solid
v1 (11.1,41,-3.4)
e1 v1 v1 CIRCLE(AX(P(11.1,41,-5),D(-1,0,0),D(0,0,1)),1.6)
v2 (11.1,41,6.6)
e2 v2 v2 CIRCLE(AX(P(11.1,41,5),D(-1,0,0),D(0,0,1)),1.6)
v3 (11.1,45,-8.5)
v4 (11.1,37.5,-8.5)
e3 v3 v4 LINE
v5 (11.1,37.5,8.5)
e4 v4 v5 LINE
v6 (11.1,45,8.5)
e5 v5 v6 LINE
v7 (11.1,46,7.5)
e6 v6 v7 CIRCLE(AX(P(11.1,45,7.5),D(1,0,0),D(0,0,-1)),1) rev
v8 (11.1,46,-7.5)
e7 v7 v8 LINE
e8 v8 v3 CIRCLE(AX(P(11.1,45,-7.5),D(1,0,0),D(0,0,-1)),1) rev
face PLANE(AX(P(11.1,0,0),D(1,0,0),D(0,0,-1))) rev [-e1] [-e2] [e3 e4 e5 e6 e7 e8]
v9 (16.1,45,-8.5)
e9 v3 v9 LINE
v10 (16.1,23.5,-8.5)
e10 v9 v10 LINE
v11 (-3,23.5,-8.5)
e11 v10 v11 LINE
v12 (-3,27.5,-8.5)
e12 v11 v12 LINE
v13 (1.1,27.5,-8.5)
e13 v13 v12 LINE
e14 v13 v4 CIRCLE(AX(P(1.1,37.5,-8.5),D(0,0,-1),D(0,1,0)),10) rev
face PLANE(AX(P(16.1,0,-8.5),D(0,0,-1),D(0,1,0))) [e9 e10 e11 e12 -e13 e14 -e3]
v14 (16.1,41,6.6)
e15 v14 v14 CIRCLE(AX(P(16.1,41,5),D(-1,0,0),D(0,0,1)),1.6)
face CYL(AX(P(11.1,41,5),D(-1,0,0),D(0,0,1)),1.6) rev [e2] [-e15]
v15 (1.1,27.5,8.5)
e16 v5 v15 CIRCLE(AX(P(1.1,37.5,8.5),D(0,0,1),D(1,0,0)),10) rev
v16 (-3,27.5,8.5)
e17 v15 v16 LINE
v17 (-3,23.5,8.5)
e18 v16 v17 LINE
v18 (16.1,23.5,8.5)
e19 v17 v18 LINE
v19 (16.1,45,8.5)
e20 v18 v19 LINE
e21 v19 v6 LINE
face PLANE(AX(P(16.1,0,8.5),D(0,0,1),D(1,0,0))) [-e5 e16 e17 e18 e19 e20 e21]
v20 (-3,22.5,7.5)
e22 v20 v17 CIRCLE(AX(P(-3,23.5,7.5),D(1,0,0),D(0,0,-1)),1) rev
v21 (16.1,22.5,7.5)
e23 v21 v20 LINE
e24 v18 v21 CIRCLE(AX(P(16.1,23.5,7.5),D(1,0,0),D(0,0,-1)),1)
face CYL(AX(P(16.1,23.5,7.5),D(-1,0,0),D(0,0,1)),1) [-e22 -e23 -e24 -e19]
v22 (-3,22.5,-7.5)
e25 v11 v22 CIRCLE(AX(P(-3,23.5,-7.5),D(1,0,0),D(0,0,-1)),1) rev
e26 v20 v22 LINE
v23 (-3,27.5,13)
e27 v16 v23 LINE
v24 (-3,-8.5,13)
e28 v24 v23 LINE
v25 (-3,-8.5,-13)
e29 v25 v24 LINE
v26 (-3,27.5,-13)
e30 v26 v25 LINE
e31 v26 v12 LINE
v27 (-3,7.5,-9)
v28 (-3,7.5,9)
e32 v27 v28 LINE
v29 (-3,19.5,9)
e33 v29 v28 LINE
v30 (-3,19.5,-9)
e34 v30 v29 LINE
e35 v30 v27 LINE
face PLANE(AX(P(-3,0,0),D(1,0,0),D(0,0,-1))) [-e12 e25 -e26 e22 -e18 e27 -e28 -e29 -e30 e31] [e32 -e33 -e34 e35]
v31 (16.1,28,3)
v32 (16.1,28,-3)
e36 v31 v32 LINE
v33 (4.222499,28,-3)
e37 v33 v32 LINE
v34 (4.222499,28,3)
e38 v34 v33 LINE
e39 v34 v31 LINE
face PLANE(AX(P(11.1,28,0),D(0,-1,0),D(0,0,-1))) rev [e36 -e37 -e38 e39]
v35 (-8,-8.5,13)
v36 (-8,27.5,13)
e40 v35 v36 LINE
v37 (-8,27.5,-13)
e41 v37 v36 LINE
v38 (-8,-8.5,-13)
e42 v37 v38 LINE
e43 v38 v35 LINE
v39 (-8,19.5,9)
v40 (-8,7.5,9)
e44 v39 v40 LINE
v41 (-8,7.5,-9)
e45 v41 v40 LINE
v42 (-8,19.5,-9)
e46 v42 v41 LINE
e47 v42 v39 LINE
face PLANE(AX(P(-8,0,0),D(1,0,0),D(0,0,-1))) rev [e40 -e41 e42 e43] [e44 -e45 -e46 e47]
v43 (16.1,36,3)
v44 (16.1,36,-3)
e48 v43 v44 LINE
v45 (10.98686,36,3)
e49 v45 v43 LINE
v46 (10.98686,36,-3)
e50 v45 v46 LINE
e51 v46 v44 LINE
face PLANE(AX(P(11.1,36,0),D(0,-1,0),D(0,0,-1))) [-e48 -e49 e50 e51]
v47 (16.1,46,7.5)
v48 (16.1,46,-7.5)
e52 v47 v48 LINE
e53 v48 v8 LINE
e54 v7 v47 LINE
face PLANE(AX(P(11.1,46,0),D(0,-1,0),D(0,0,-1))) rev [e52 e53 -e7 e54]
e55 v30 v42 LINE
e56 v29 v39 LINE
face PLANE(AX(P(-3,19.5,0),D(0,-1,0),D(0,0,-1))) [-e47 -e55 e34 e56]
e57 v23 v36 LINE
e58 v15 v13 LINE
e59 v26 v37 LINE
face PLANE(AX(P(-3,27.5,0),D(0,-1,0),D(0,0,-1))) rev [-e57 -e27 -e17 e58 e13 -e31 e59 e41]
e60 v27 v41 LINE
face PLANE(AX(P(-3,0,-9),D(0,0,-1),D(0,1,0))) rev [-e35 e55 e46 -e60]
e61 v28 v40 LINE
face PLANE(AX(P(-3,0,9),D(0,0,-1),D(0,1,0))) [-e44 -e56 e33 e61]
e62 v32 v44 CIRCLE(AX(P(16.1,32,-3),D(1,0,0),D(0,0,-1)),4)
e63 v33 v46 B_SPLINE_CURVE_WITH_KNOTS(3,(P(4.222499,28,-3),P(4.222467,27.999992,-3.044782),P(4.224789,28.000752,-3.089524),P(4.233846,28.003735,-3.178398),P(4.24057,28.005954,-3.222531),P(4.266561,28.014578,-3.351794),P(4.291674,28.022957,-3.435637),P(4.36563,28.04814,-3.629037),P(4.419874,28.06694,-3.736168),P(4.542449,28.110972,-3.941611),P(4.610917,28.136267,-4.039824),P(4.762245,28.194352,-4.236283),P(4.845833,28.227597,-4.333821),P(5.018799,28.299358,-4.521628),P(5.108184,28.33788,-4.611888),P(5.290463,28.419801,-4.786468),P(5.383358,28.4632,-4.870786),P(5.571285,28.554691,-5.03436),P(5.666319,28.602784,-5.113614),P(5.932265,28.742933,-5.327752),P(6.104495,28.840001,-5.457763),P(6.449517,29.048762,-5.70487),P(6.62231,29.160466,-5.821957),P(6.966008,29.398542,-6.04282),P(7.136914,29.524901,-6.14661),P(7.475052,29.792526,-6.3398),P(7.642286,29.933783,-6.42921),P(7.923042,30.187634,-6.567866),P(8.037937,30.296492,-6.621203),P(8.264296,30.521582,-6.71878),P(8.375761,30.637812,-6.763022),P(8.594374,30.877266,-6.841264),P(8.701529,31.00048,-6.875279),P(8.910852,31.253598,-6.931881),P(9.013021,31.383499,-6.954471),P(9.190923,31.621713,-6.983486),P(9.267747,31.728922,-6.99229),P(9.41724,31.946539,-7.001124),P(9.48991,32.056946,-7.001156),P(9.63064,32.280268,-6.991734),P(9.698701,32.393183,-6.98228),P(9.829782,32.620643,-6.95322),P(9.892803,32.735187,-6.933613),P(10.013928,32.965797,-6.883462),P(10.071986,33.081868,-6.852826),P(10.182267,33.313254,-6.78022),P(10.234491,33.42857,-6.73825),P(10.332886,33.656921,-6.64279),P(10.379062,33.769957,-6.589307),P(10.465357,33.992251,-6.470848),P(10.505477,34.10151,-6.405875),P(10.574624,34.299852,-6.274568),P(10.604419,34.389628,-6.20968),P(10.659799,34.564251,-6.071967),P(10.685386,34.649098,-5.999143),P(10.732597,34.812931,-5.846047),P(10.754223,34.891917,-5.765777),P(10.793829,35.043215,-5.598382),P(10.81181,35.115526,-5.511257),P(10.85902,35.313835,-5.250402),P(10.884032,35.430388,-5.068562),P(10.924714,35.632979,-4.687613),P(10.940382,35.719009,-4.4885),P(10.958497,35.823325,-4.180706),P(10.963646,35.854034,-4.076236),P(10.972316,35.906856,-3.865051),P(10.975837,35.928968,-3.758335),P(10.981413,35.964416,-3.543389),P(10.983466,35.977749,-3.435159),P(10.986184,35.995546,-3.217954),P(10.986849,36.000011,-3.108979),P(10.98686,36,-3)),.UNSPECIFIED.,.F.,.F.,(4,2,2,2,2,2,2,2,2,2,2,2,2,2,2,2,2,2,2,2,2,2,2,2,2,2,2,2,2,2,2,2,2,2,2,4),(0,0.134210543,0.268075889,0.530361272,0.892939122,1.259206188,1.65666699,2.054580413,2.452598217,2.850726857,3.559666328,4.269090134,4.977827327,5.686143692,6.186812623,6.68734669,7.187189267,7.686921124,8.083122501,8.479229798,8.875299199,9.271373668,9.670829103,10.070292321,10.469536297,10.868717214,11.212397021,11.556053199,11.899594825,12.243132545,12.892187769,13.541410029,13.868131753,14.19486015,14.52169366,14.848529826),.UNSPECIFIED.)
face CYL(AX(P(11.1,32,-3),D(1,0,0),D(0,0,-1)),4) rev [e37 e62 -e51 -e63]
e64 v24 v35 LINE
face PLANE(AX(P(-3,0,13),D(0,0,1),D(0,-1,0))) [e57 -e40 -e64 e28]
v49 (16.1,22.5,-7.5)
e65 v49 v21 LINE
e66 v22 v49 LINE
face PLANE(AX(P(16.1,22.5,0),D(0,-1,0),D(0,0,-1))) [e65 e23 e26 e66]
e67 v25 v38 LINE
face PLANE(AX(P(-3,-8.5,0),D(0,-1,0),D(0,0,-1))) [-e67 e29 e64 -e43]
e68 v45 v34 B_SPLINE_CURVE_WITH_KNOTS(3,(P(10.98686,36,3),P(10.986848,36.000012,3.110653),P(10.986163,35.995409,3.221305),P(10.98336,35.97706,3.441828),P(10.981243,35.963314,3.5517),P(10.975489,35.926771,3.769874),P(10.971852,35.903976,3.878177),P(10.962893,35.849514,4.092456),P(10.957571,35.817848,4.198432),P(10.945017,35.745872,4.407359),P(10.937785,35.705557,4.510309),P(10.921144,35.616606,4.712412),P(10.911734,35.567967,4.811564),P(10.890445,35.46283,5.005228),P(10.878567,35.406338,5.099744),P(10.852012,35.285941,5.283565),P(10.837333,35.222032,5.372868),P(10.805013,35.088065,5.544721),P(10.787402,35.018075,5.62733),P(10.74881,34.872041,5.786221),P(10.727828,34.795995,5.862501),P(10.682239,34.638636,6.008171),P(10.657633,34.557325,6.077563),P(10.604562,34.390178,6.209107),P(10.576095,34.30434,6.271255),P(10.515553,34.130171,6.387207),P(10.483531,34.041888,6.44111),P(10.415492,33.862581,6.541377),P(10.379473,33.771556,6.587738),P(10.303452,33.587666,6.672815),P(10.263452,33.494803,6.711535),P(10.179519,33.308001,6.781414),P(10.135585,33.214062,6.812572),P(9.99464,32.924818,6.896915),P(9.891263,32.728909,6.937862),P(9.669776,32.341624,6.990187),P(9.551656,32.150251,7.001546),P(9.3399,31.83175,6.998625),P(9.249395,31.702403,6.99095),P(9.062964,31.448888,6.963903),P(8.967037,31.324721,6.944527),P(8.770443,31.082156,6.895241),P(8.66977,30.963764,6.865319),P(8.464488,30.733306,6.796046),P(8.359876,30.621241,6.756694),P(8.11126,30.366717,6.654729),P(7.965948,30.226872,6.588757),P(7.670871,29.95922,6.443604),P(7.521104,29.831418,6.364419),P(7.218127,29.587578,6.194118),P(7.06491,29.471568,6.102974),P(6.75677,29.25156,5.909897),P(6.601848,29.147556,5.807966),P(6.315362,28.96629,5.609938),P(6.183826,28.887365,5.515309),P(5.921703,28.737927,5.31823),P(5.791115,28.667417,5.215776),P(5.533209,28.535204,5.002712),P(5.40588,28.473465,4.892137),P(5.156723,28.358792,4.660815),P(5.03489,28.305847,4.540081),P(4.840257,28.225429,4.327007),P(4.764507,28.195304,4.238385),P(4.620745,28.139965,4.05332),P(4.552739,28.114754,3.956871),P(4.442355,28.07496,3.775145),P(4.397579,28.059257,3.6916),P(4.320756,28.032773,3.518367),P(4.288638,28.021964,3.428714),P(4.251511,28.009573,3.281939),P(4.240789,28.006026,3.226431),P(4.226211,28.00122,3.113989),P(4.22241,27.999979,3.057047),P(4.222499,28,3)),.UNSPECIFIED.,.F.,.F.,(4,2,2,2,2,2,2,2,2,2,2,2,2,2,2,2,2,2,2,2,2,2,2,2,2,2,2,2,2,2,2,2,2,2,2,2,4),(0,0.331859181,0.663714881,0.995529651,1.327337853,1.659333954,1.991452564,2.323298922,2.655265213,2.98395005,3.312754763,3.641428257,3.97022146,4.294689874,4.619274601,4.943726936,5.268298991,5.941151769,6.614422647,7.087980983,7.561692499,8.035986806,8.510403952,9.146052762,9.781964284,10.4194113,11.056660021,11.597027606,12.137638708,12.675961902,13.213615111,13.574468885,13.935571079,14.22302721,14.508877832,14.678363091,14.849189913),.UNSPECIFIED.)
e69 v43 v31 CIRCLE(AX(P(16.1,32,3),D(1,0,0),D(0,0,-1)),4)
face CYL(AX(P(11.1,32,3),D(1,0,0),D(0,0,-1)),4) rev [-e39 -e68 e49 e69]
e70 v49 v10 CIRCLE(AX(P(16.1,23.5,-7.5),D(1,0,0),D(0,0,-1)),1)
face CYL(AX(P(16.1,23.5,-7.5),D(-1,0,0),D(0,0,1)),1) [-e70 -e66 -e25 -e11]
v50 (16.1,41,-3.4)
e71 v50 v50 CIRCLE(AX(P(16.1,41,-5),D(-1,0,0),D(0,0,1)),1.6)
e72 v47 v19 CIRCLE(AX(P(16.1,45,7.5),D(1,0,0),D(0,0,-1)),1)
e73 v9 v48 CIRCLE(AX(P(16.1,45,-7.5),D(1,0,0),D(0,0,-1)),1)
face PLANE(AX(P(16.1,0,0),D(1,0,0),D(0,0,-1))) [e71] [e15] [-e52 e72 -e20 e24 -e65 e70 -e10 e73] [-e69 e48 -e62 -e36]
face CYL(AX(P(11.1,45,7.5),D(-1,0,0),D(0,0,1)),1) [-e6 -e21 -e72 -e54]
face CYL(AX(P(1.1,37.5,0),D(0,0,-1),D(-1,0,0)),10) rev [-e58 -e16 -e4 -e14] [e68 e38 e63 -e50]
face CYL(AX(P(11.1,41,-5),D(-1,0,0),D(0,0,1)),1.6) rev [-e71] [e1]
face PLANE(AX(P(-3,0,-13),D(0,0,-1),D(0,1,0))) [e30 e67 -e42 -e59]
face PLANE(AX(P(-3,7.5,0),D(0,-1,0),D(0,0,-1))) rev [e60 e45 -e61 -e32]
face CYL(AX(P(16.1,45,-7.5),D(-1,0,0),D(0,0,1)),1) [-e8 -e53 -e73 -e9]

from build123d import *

# Parameters (mm, degrees)
BOSS_EXTRUDE1_START      = -8
SKETCH2_W                = 26
SKETCH2_H                = 36
SKETCH2_W_2              = 18
SKETCH2_H_2              = 12
BOSS_EXTRUDE1_DEPTH      = 5
BOSS_EXTRUDE2_START      = -3
SKETCH2_7_W              = 17
SKETCH2_7_H              = 5
BOSS_EXTRUDE2_DEPTH      = 19.1
BOSS_EXTRUDE3_START      = 11.1
SKETCH2_14_W             = 17
SKETCH2_14_H             = 18.5
BOSS_EXTRUDE3_DEPTH      = 5
M3_CLEARANCE_HOLE1_D     = 3.2
M3_CLEARANCE_HOLE1_DEPTH = 5
M3_CLEARANCE_HOLE1_TIP   = 0.96137699
FILLET1_START            = -8.5
FILLET1_DEPTH            = 17
FILLET1_2_DEPTH          = 1.500148193
FILLET1_START_2          = 6.999851807
FILLET1_3_DEPTH          = 1.500148193
FILLET1_START_3          = 5.377704746
FILLET1_4_DEPTH          = 5.722295254
FILLET1_START_4          = 5.601514307
FILLET1_5_DEPTH          = 5.498485693
FILLET1_START_5          = 4.22249738
FILLET1_6_DEPTH          = 5.871975237
FILLET1_START_6          = -6.999851807
FILLET1_7_DEPTH          = 13.999703614
FILLET3_R                = 1


with BuildPart() as part:
    # Sketch2 → Boss-Extrude1 (new body)
    with BuildSketch(Plane(origin=(0, 0, 0), x_dir=(0, 0, -1), z_dir=(1, 0, 0)).offset(BOSS_EXTRUDE1_START)):
        with Locations((0, 9.5)):
            Rectangle(SKETCH2_W, SKETCH2_H)
        with Locations((0, 13.5)):
            Rectangle(SKETCH2_W_2, SKETCH2_H_2, mode=Mode.SUBTRACT)
    extrude(amount=BOSS_EXTRUDE1_DEPTH)

    # Sketch2<7> → Boss-Extrude2 (add)
    with BuildSketch(Plane(origin=(0, 0, 0), x_dir=(0, 0, -1), z_dir=(1, 0, 0)).offset(BOSS_EXTRUDE2_START)):
        with Locations((0, 25)):
            Rectangle(SKETCH2_7_W, SKETCH2_7_H)
    extrude(amount=BOSS_EXTRUDE2_DEPTH)

    # Sketch2<14> → Boss-Extrude3 (add)
    with BuildSketch(Plane(origin=(0, 0, 0), x_dir=(0, 0, -1), z_dir=(1, 0, 0)).offset(BOSS_EXTRUDE3_START)):
        with Locations((0, 36.75)):
            Rectangle(SKETCH2_14_W, SKETCH2_14_H)
        with BuildLine():
            Line((3, 28), (-3, 28))
            ThreePointArc((-3, 28), (-7, 32), (-3, 36))
            Line((-3, 36), (3, 36))
            ThreePointArc((3, 36), (7, 32), (3, 28))
        make_face(mode=Mode.SUBTRACT)
    extrude(amount=BOSS_EXTRUDE3_DEPTH)

    # M3 Clearance Hole1
    with Locations(Plane.ZY.offset(-11.1)):
        with Locations((5, 41), (-5, 41)):
            Hole(M3_CLEARANCE_HOLE1_D / 2, depth=M3_CLEARANCE_HOLE1_DEPTH)
            with Locations((0, 0, -(M3_CLEARANCE_HOLE1_DEPTH + M3_CLEARANCE_HOLE1_TIP / 2))):  # 118° drill point
                Cone(0, M3_CLEARANCE_HOLE1_D / 2, M3_CLEARANCE_HOLE1_TIP, mode=Mode.SUBTRACT)

    # Fillet1: read off the stored shape, not the designer's step
    # Fillet1 outline → Fillet1 (add)
    with BuildSketch(Plane.XY.offset(FILLET1_START)):
        with BuildLine():
            Line((11.1, 28), (4.222498999, 28))
            ThreePointArc((4.222498999, 28), (2.68113883, 27.625791171), (1.1, 27.5))
            Line((1.1, 27.5), (11.1, 27.5))
            Line((11.1, 27.5), (11.1, 28))
        make_face()
        with BuildLine():
            ThreePointArc((11.1, 37.5), (11.071674876, 36.747869581), (10.986859967, 36))
            Line((10.986859967, 36), (11.1, 36))
            Line((11.1, 36), (11.1, 37.5))
        make_face()
    extrude(amount=FILLET1_DEPTH)

    # Fillet1 2 outline → Fillet1 2 (add)
    with BuildSketch(Plane.XY.offset(FILLET1_START)):
        with BuildLine():
            ThreePointArc((10.986859967, 36), (8.736154476, 31.04328684), (4.222498999, 28))
            Line((4.222498999, 28), (11.1, 28))
            Line((11.1, 28), (11.1, 36))
            Line((11.1, 36), (10.986859967, 36))
        make_face()
    extrude(amount=FILLET1_2_DEPTH)

    # Fillet1 3 outline → Fillet1 3 (add)
    with BuildSketch(Plane.XY.offset(FILLET1_START_2)):
        with BuildLine():
            ThreePointArc((10.986859967, 36), (8.736154476, 31.04328684), (4.222498999, 28))
            Line((4.222498999, 28), (11.1, 28))
            Line((11.1, 28), (11.1, 36))
            Line((11.1, 36), (10.986859967, 36))
        make_face()
    extrude(amount=FILLET1_3_DEPTH)

    # Fillet1 4 outline → Fillet1 4 (cut)
    with BuildSketch(Plane.YZ.offset(FILLET1_START_3)):
        with BuildLine():
            Line((31.965568589, 6.999851807), (32.034431411, 6.999851807))
            ThreePointArc((32.034431411, 6.999851807), (32, 7), (31.965568589, 6.999851807))
        make_face()
        with BuildLine():
            ThreePointArc((31.965568589, -6.999851807), (32, -7), (32.034431411, -6.999851807))
            Line((32.034431411, -6.999851807), (31.965568589, -6.999851807))
        make_face()
    extrude(amount=FILLET1_4_DEPTH, mode=Mode.SUBTRACT)

    # Fillet1 5 outline → Fillet1 5 (add)
    with BuildSketch(Plane.YZ.offset(FILLET1_START_4)):
        with BuildLine():
            ThreePointArc((32.034431411, 6.999851807), (34.840574382, 5.816227473), (36, 3))
            Line((36, 3), (36, 6.999851807))
            Line((36, 6.999851807), (32.034431411, 6.999851807))
        make_face()
        with BuildLine():
            Line((36, -6.999851807), (36, -3))
            ThreePointArc((36, -3), (34.840574382, -5.816227473), (32.034431411, -6.999851807))
            Line((32.034431411, -6.999851807), (36, -6.999851807))
        make_face()
        with BuildLine():
            ThreePointArc((28, 3), (29.159425618, 5.816227473), (31.965568589, 6.999851807))
            Line((31.965568589, 6.999851807), (28, 6.999851807))
            Line((28, 6.999851807), (28, 3))
        make_face()
        with BuildLine():
            Line((28, -6.999851807), (31.965568589, -6.999851807))
            ThreePointArc((31.965568589, -6.999851807), (29.159425618, -5.816227473), (28, -3))
            Line((28, -3), (28, -6.999851807))
        make_face()
    extrude(amount=FILLET1_5_DEPTH)

    # Fillet1 6 outline → Fillet1 6 (add)
    with BuildSketch(Plane.YZ.offset(FILLET1_START_5)):
        with BuildLine():
            ThreePointArc((28, 3), (29.159425618, 5.816227473), (31.965568589, 6.999851807))
            Line((31.965568589, 6.999851807), (28, 6.999851807))
            Line((28, 6.999851807), (28, 3))
        make_face()
        with BuildLine():
            Line((28, -6.999851807), (31.965568589, -6.999851807))
            ThreePointArc((31.965568589, -6.999851807), (29.159425618, -5.816227473), (28, -3))
            Line((28, -3), (28, -6.999851807))
        make_face()
    extrude(amount=FILLET1_6_DEPTH)

    # Fillet1 7 outline → Fillet1 7 (cut)
    with BuildSketch(Plane.XY.offset(FILLET1_START_6)):
        with BuildLine():
            ThreePointArc((4.222497538, 27.99999952), (8.736153979, 31.043286253), (10.986859967, 36))
            ThreePointArc((10.986859967, 36), (11.049747147, 36.498734945), (11.087492178, 37))
            Line((11.087492178, 37), (3, 37))
            Line((3, 37), (3, 27.682159097))
            ThreePointArc((3, 27.682159097), (3.616272245, 27.821757701), (4.222497538, 27.99999952))
        make_face()
    extrude(amount=FILLET1_7_DEPTH, mode=Mode.SUBTRACT)

    # Fillet3
    fillet3_edges = [part.edges().sort_by_distance(p)[0] for p in [
        (6.55, 22.5, -8.5),
        (6.55, 22.5, 8.5),
        (13.6, 46, -8.5),
        (13.6, 46, 8.5),
    ]]
    fillet(fillet3_edges, radius=FILLET3_R)


solid = part.part
